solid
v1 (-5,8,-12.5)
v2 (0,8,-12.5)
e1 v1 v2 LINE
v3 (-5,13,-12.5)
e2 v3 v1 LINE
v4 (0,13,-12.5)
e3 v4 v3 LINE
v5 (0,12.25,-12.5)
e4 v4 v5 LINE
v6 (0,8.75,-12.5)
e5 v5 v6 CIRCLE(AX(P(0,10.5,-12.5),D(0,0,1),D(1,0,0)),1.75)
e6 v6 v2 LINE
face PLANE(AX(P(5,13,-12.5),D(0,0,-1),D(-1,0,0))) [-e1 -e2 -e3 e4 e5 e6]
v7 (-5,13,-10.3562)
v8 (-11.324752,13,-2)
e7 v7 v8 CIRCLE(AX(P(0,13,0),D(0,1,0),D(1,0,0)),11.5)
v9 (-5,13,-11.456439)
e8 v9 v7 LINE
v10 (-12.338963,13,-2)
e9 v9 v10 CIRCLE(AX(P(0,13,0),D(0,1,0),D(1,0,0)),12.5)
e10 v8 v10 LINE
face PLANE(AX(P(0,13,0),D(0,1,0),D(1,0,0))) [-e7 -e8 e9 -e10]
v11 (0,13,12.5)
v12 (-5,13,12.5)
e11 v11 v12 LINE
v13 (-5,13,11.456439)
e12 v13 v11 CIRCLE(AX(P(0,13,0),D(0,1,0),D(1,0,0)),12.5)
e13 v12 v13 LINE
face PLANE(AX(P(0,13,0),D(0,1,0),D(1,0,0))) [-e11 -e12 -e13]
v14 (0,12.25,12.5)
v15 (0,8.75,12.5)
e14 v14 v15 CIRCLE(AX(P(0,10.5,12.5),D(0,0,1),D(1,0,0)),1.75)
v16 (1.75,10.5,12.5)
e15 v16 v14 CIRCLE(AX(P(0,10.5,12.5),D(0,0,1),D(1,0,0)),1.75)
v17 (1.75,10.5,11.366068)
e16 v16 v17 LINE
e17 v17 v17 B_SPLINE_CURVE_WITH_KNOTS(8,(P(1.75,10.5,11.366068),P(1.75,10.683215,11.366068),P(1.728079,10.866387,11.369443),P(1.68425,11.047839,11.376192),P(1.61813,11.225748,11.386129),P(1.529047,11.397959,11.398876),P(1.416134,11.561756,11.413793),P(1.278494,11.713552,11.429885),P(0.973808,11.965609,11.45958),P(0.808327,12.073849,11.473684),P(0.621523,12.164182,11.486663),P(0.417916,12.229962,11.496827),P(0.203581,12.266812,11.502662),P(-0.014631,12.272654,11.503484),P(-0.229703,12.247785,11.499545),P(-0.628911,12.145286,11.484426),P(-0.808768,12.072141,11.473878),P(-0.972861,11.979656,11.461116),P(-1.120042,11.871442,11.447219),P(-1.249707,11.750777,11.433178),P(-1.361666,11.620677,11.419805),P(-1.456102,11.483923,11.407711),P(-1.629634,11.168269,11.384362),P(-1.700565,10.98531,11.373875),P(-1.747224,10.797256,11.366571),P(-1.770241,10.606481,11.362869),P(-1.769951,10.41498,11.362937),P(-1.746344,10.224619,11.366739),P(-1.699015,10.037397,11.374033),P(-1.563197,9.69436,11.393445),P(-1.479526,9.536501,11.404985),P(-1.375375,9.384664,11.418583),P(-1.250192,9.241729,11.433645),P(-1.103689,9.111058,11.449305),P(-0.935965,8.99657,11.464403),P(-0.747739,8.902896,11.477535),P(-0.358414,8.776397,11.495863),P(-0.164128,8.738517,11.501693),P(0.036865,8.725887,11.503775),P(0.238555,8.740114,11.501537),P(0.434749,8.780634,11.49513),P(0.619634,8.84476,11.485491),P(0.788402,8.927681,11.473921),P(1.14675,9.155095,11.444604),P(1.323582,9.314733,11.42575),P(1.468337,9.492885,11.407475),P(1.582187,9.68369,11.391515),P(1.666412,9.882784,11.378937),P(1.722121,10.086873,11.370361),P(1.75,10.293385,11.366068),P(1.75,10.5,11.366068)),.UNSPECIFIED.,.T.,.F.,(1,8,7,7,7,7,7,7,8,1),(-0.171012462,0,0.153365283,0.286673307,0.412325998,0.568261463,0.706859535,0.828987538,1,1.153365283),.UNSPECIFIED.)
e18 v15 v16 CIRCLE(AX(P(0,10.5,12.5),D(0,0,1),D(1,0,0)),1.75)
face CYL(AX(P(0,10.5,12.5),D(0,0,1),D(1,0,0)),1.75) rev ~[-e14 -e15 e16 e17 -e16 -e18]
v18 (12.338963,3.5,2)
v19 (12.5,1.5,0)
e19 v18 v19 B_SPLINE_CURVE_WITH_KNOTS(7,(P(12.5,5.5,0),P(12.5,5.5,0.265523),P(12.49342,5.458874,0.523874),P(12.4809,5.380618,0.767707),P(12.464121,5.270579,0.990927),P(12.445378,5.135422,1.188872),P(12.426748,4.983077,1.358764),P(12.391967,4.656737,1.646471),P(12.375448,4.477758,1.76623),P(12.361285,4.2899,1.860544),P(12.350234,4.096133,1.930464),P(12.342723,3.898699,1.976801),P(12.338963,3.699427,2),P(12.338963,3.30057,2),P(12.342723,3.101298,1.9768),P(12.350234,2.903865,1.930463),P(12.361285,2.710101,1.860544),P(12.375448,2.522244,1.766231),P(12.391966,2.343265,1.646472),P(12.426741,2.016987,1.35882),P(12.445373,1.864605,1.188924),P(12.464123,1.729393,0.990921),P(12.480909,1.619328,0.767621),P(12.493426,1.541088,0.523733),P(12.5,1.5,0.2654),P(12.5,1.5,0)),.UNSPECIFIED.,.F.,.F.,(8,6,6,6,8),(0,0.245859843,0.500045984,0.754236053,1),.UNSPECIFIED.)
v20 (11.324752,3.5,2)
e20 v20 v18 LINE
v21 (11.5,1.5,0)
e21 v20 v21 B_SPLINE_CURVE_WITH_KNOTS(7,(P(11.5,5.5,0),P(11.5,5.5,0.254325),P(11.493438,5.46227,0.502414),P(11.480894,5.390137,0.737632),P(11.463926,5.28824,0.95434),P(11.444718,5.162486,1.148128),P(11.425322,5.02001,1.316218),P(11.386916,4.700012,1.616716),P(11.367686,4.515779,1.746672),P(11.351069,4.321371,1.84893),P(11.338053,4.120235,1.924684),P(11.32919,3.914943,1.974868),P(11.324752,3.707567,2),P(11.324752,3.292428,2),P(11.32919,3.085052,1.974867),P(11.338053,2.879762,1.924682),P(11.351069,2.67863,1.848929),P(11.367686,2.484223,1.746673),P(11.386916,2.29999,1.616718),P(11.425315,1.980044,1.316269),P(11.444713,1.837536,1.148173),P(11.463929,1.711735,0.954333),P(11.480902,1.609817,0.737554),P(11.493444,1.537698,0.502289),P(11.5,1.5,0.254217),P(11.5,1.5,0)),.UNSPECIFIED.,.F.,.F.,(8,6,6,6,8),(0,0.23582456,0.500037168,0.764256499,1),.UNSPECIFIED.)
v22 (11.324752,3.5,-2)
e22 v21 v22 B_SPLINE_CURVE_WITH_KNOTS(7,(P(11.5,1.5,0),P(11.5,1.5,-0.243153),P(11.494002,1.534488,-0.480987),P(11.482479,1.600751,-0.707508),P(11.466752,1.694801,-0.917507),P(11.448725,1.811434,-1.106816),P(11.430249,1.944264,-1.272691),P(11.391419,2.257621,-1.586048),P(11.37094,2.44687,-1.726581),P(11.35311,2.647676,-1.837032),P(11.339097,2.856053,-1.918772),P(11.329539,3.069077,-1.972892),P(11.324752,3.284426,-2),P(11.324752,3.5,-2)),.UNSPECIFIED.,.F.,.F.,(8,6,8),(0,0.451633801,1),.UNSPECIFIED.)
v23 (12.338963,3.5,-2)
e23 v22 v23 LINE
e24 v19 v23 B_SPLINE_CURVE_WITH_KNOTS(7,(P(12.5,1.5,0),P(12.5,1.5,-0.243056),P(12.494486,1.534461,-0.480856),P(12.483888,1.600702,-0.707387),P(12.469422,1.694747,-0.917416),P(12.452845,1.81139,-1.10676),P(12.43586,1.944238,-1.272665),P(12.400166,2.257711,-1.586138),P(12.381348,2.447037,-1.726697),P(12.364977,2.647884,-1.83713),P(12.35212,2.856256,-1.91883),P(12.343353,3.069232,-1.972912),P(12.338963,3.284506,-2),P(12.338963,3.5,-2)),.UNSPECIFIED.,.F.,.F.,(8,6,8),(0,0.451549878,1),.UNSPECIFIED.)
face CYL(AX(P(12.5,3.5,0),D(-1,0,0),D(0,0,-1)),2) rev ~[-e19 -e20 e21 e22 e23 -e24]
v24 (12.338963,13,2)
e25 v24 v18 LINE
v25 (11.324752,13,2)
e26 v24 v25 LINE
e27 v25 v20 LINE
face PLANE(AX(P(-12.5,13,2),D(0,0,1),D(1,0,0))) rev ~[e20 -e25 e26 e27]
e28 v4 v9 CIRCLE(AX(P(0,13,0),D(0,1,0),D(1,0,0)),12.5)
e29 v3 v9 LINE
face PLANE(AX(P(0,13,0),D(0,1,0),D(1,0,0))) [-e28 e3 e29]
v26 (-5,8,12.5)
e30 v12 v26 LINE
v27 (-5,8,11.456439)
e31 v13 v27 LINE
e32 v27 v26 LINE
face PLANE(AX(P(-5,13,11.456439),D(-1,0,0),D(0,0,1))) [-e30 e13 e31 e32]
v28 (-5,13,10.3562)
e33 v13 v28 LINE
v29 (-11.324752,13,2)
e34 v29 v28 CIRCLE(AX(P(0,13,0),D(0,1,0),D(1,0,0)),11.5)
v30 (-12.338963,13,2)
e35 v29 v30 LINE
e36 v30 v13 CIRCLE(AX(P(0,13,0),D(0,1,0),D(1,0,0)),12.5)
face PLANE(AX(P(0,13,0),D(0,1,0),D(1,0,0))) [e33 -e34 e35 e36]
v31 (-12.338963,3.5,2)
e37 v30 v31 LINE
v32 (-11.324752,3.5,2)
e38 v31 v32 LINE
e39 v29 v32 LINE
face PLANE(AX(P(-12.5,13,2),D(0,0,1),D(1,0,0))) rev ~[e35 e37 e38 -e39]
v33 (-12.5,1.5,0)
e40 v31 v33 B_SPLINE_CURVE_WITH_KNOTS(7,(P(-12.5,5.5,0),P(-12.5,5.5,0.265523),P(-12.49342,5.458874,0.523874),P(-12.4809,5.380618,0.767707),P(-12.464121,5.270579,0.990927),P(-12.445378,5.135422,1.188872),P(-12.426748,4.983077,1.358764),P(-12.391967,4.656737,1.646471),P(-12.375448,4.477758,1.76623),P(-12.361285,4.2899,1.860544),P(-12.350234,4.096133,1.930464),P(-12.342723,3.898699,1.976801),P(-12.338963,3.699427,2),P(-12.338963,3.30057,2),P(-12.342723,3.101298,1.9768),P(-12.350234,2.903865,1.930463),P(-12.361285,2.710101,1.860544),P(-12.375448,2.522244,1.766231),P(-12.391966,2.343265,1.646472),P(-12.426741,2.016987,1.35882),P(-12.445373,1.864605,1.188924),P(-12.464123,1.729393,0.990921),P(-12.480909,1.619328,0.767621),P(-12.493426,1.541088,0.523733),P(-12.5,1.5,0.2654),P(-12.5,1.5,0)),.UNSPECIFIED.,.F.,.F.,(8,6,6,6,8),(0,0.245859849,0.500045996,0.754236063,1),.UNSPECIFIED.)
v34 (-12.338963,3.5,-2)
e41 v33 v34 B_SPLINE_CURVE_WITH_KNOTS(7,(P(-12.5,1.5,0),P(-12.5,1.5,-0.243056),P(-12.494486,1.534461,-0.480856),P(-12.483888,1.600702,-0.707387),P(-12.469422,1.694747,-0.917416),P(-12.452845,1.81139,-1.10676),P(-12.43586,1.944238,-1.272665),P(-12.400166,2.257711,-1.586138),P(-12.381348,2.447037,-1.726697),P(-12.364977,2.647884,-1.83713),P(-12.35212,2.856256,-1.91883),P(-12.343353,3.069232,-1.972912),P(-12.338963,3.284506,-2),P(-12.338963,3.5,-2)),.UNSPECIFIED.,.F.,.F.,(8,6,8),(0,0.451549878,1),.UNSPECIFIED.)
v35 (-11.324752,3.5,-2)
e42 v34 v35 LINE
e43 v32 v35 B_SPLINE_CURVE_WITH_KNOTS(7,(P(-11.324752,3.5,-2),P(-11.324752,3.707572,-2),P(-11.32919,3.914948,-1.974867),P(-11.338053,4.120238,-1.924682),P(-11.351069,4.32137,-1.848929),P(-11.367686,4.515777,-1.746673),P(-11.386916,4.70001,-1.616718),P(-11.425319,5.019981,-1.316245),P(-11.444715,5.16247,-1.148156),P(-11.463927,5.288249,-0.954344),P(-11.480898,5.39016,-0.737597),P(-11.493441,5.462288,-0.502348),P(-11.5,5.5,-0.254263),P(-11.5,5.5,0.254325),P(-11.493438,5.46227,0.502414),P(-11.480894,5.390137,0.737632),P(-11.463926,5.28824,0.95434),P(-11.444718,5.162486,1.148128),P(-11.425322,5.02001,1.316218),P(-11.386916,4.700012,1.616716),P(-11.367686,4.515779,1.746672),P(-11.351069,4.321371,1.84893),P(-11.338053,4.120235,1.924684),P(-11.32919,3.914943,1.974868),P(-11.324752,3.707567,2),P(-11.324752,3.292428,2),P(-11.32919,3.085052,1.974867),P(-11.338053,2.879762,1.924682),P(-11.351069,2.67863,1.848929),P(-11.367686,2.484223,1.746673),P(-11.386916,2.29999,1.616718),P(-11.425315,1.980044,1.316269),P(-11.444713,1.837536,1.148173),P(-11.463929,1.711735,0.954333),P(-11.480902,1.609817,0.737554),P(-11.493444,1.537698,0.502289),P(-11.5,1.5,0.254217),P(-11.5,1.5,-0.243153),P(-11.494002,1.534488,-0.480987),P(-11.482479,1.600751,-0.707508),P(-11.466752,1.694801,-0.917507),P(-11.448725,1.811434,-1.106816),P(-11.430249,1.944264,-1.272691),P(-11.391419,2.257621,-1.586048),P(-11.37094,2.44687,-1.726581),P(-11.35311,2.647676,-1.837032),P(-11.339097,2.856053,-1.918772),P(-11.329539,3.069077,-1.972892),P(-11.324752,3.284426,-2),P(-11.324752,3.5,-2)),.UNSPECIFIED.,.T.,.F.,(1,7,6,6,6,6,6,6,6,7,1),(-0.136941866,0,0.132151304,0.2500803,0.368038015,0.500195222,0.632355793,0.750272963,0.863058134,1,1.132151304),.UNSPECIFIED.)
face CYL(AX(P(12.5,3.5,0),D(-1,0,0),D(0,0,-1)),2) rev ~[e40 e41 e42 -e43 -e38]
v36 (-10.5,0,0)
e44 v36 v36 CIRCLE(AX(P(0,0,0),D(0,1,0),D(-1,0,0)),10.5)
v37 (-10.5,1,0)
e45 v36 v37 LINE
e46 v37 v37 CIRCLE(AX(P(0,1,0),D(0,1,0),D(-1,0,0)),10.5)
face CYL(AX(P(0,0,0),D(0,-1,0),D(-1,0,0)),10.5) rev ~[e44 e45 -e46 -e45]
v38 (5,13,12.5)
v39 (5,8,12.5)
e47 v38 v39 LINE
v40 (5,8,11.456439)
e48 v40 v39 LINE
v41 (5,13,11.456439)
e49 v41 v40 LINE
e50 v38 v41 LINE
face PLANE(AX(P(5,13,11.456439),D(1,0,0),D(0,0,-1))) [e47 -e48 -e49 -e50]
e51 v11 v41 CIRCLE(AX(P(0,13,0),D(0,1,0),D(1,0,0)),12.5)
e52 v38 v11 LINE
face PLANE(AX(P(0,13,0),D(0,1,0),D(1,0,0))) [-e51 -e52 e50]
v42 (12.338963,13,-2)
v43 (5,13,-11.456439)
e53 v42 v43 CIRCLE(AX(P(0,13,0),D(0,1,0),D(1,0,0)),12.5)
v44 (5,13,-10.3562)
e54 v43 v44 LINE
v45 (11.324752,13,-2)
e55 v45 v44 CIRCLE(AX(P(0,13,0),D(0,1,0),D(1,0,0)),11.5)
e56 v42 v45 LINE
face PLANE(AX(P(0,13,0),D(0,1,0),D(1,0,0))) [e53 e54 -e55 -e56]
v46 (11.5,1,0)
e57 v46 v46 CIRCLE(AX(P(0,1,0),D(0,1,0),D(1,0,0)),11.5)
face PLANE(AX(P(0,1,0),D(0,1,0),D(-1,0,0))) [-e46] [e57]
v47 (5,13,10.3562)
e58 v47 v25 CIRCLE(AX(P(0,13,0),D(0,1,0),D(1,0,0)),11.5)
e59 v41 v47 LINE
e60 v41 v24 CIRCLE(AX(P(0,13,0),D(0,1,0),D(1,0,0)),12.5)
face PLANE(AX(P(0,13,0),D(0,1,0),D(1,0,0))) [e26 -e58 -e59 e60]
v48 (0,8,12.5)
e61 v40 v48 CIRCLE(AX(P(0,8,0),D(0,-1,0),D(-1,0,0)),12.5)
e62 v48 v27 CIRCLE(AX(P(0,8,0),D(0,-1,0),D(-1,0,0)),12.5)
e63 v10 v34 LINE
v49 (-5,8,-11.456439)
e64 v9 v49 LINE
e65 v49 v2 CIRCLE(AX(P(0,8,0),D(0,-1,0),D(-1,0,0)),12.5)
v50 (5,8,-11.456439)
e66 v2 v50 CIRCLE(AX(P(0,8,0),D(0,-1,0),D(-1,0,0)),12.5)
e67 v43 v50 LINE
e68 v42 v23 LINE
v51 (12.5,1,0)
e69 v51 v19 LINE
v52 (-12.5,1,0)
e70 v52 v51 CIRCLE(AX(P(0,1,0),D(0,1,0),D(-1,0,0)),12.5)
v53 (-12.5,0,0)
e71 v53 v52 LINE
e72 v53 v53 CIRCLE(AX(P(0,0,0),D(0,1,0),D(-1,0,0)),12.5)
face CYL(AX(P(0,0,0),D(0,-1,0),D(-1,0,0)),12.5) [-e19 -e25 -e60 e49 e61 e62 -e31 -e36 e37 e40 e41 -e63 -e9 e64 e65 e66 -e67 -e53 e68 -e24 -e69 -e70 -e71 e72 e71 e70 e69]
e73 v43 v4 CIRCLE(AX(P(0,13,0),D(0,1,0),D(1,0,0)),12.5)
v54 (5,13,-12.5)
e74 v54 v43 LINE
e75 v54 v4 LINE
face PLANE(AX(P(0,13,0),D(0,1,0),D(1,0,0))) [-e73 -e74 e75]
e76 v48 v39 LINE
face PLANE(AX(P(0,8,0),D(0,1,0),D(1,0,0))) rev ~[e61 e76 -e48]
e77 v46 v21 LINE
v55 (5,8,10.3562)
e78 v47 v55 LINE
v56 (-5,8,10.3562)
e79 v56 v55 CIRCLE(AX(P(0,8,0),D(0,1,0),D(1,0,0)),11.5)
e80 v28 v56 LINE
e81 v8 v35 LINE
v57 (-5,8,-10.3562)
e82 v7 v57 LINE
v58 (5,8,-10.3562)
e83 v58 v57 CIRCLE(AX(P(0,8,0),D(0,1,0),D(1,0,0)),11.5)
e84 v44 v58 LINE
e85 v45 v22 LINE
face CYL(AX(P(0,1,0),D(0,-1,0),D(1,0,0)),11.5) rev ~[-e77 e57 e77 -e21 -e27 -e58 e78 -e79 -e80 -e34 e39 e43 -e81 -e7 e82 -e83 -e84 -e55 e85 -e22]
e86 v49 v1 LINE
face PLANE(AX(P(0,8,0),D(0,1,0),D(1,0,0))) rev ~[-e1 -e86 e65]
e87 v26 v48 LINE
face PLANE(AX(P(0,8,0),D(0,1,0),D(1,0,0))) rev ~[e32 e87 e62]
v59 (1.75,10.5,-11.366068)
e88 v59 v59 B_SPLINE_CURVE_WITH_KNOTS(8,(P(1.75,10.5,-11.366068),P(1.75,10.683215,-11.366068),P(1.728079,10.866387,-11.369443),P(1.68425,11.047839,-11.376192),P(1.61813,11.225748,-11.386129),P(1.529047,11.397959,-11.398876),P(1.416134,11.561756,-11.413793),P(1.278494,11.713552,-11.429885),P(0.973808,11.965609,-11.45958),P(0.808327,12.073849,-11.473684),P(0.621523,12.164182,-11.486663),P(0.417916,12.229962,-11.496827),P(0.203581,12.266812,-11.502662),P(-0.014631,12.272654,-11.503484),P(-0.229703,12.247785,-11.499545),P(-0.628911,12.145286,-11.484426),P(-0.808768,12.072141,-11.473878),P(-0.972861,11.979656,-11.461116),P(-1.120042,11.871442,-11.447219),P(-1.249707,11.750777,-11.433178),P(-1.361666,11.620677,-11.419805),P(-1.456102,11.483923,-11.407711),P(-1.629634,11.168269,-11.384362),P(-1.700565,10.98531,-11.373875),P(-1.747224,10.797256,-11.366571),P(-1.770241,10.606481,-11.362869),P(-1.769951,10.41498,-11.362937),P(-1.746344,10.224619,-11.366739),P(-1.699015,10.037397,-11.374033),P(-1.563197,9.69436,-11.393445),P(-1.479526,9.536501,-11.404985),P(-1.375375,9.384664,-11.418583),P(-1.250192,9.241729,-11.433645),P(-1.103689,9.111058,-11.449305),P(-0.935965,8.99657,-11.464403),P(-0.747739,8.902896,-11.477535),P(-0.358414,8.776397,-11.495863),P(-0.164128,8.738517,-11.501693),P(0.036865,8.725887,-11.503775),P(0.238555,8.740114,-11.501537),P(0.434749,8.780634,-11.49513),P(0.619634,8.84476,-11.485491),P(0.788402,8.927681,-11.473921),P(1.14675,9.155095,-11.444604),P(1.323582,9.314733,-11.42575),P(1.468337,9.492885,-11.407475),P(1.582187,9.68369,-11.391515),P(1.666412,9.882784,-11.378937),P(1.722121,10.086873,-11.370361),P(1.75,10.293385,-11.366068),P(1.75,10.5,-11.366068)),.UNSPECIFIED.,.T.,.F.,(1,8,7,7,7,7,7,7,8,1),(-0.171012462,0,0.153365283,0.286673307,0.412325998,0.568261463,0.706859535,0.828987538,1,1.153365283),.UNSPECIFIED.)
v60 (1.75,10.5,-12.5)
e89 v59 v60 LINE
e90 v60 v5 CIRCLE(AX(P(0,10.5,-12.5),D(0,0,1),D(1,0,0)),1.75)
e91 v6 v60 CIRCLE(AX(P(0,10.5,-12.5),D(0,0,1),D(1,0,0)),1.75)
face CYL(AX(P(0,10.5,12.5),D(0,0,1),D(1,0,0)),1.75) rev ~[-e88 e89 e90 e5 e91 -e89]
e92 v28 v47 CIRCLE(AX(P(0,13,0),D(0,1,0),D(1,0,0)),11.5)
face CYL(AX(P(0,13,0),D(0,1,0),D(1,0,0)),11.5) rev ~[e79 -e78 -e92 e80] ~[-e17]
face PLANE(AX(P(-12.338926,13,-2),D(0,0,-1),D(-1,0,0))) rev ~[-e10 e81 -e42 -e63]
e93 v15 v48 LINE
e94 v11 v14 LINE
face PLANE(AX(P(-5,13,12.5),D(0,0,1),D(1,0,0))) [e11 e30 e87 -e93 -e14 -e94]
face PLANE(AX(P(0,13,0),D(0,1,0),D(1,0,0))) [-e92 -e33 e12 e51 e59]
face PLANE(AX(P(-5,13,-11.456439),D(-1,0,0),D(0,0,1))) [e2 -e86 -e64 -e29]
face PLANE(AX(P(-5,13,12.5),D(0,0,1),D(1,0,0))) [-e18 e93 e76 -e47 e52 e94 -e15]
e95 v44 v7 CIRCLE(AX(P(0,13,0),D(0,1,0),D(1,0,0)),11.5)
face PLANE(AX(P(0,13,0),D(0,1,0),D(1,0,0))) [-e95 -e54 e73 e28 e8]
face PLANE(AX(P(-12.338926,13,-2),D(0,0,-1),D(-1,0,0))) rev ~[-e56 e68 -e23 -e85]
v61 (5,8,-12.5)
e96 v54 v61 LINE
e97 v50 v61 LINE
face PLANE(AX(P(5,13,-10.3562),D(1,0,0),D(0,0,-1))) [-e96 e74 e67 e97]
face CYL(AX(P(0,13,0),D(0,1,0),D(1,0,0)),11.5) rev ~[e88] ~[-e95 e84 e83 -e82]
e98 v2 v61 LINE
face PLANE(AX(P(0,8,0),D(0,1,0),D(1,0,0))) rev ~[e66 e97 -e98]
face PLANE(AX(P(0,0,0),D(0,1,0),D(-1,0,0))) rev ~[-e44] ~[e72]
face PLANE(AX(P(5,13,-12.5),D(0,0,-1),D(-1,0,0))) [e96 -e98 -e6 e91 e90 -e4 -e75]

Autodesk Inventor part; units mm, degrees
ref_plane "YZ Plane" through (0, 0, 0) normal (1, 0, 0) x (0, 1, 0)
ref_plane "XZ Plane" through (0, 0, 0) normal (0, 1, 0) x (-1, 0, 0)
ref_plane "XY Plane" through (0, 0, 0) normal (0, 0, 1) x (1, 0, 0)
sketch "Esquisse1" plane through (0, 0, 0) normal (0, 1, 0) x (-1, 0, 0)
  circle A0 centre (0, 0) radius 10.5
  circle A1 centre (0, 0) radius 12.5
  dimension "d0" = 21
  dimension "d1" = 25
extrude "Extrusion1" add sketch "Esquisse1" along normal blind 1
sketch "Esquisse2" plane through (0, 1, 0) normal (0, 1, 0) x (1, 0, 0)
  circle A0 centre (0, 0) radius 12.5
  circle A1 centre (0, 0) radius 11.5
  dimension "d4" = 23
  dimension "d5" = 25
extrude "Extrusion2" add sketch "Esquisse2" along normal blind 12
sketch "Esquisse3" plane through (0, 13, 0) normal (0, 1, 0) x (1, 0, 0)
  line L0 (-5, -12.5) -> (5, -12.5)
  line L1 (5, -12.5) -> (5, -10.3562)
  line L2 (5, 12.5) -> (-5, 12.5)
  line L3 (-5, 12.5) -> (-5, 10.3562)
  circle A0 centre (0, 0) radius 12.5 projected
  arc A1 (-5, 10.3562) -> (-5, -10.3562) centre (0, 0) ccw
  circle A2 centre (0, 0) radius 11.5 projected
  arc A3 (5, 10.3562) -> (-5, 10.3562) centre (0, 0) ccw
  arc A4 (-5, -10.3562) -> (5, -10.3562) centre (0, 0) ccw
  arc A5 (5, -10.3562) -> (5, 10.3562) centre (0, 0) ccw
  line L4 (-5, 10.3562) -> (-5, -10.3562)
  line L5 (-5, -10.3562) -> (-5, -12.5)
  line L6 (5, 10.3562) -> (5, 12.5)
  line L7 (5, -10.3562) -> (5, 10.3562)
  dimension "d8" = 5
  dimension "d9" = 5
  dimension "d10" = 0
extrude "Extrusion3" add sketch "Esquisse3" against normal blind 5 contours L5 A0 L0 | A0 L1 L0 | A0 L5 A2 L1 | A0 L6 A2 L3 | L3 L2 A0 | L2 L6 A0
sketch "Esquisse4" plane through (-5, 13, 12.5) normal (0, 0, 1) x (1, 0, 0)
  line L0 (10, -5) -> (0, 0) construction
  line L1 (10, 0) -> (0, -5) construction
  circle A0 centre (5, -2.5) radius 1.75
  point P0 (5, -13)
  dimension "d13" = 3.5
extrude "Extrusion4" cut sketch "Esquisse4" against normal through all
sketch "Esquisse6" plane through (0, 13, 0) normal (0, 1, 0) x (1, 0, 0)
  line L0 (-12.5, -2) -> (12.5, -2)
  line L1 (12.5, -2) -> (12.5, 2)
  line L2 (12.5, 2) -> (-12.5, 2)
  line L3 (-12.5, 2) -> (-12.5, -2)
  arc A0 (-5, 11.4564) -> (-5, -11.4564) centre (0, 0) ccw projected
  arc A1 (5, -11.4564) -> (5, 11.4564) centre (0, 0) ccw projected
  dimension "d17" = 4
  dimension "d18" = 2
extrude "Extrusion5" cut sketch "Esquisse6" against normal blind 9.5
sketch "Esquisse7" plane through (0, 3.5, 0) normal (0, 1, 0) x (1, 0, 0)
  line L0 (-12.5, -2) -> (12.5, -2)
  line L1 (12.5, -2) -> (12.5, 0)
  line L2 (12.5, 2) -> (-12.5, 2)
  line L3 (-12.5, 2) -> (-12.5, 0)
  line L4 (-11.3248, -2) -> (-12.339, -2) projected
  line L5 (-12.339, 2) -> (-11.3248, 2) projected
  arc A0 (-12.339, 2) -> (-12.339, -2) centre (0, 0) ccw projected
  arc A1 (12.339, -2) -> (12.339, 2) centre (0, 0) ccw projected
  line L6 (-12.5, 0) -> (12.5, 0)
  line L7 (-12.5, 0) -> (-12.5, -2)
  line L8 (12.5, 0) -> (12.5, 2)
revolve "Révolution1" cut sketch "Esquisse7" angle 360 about axis through (-12.5, 3.5, 0) along (1, 0, 0) contours L3 L2 A0 | A0 L2 A1 L6 | A1 L2 L8
equation "\"d18\" = 0.5 * d17"
properties part number "optoforce_base"
